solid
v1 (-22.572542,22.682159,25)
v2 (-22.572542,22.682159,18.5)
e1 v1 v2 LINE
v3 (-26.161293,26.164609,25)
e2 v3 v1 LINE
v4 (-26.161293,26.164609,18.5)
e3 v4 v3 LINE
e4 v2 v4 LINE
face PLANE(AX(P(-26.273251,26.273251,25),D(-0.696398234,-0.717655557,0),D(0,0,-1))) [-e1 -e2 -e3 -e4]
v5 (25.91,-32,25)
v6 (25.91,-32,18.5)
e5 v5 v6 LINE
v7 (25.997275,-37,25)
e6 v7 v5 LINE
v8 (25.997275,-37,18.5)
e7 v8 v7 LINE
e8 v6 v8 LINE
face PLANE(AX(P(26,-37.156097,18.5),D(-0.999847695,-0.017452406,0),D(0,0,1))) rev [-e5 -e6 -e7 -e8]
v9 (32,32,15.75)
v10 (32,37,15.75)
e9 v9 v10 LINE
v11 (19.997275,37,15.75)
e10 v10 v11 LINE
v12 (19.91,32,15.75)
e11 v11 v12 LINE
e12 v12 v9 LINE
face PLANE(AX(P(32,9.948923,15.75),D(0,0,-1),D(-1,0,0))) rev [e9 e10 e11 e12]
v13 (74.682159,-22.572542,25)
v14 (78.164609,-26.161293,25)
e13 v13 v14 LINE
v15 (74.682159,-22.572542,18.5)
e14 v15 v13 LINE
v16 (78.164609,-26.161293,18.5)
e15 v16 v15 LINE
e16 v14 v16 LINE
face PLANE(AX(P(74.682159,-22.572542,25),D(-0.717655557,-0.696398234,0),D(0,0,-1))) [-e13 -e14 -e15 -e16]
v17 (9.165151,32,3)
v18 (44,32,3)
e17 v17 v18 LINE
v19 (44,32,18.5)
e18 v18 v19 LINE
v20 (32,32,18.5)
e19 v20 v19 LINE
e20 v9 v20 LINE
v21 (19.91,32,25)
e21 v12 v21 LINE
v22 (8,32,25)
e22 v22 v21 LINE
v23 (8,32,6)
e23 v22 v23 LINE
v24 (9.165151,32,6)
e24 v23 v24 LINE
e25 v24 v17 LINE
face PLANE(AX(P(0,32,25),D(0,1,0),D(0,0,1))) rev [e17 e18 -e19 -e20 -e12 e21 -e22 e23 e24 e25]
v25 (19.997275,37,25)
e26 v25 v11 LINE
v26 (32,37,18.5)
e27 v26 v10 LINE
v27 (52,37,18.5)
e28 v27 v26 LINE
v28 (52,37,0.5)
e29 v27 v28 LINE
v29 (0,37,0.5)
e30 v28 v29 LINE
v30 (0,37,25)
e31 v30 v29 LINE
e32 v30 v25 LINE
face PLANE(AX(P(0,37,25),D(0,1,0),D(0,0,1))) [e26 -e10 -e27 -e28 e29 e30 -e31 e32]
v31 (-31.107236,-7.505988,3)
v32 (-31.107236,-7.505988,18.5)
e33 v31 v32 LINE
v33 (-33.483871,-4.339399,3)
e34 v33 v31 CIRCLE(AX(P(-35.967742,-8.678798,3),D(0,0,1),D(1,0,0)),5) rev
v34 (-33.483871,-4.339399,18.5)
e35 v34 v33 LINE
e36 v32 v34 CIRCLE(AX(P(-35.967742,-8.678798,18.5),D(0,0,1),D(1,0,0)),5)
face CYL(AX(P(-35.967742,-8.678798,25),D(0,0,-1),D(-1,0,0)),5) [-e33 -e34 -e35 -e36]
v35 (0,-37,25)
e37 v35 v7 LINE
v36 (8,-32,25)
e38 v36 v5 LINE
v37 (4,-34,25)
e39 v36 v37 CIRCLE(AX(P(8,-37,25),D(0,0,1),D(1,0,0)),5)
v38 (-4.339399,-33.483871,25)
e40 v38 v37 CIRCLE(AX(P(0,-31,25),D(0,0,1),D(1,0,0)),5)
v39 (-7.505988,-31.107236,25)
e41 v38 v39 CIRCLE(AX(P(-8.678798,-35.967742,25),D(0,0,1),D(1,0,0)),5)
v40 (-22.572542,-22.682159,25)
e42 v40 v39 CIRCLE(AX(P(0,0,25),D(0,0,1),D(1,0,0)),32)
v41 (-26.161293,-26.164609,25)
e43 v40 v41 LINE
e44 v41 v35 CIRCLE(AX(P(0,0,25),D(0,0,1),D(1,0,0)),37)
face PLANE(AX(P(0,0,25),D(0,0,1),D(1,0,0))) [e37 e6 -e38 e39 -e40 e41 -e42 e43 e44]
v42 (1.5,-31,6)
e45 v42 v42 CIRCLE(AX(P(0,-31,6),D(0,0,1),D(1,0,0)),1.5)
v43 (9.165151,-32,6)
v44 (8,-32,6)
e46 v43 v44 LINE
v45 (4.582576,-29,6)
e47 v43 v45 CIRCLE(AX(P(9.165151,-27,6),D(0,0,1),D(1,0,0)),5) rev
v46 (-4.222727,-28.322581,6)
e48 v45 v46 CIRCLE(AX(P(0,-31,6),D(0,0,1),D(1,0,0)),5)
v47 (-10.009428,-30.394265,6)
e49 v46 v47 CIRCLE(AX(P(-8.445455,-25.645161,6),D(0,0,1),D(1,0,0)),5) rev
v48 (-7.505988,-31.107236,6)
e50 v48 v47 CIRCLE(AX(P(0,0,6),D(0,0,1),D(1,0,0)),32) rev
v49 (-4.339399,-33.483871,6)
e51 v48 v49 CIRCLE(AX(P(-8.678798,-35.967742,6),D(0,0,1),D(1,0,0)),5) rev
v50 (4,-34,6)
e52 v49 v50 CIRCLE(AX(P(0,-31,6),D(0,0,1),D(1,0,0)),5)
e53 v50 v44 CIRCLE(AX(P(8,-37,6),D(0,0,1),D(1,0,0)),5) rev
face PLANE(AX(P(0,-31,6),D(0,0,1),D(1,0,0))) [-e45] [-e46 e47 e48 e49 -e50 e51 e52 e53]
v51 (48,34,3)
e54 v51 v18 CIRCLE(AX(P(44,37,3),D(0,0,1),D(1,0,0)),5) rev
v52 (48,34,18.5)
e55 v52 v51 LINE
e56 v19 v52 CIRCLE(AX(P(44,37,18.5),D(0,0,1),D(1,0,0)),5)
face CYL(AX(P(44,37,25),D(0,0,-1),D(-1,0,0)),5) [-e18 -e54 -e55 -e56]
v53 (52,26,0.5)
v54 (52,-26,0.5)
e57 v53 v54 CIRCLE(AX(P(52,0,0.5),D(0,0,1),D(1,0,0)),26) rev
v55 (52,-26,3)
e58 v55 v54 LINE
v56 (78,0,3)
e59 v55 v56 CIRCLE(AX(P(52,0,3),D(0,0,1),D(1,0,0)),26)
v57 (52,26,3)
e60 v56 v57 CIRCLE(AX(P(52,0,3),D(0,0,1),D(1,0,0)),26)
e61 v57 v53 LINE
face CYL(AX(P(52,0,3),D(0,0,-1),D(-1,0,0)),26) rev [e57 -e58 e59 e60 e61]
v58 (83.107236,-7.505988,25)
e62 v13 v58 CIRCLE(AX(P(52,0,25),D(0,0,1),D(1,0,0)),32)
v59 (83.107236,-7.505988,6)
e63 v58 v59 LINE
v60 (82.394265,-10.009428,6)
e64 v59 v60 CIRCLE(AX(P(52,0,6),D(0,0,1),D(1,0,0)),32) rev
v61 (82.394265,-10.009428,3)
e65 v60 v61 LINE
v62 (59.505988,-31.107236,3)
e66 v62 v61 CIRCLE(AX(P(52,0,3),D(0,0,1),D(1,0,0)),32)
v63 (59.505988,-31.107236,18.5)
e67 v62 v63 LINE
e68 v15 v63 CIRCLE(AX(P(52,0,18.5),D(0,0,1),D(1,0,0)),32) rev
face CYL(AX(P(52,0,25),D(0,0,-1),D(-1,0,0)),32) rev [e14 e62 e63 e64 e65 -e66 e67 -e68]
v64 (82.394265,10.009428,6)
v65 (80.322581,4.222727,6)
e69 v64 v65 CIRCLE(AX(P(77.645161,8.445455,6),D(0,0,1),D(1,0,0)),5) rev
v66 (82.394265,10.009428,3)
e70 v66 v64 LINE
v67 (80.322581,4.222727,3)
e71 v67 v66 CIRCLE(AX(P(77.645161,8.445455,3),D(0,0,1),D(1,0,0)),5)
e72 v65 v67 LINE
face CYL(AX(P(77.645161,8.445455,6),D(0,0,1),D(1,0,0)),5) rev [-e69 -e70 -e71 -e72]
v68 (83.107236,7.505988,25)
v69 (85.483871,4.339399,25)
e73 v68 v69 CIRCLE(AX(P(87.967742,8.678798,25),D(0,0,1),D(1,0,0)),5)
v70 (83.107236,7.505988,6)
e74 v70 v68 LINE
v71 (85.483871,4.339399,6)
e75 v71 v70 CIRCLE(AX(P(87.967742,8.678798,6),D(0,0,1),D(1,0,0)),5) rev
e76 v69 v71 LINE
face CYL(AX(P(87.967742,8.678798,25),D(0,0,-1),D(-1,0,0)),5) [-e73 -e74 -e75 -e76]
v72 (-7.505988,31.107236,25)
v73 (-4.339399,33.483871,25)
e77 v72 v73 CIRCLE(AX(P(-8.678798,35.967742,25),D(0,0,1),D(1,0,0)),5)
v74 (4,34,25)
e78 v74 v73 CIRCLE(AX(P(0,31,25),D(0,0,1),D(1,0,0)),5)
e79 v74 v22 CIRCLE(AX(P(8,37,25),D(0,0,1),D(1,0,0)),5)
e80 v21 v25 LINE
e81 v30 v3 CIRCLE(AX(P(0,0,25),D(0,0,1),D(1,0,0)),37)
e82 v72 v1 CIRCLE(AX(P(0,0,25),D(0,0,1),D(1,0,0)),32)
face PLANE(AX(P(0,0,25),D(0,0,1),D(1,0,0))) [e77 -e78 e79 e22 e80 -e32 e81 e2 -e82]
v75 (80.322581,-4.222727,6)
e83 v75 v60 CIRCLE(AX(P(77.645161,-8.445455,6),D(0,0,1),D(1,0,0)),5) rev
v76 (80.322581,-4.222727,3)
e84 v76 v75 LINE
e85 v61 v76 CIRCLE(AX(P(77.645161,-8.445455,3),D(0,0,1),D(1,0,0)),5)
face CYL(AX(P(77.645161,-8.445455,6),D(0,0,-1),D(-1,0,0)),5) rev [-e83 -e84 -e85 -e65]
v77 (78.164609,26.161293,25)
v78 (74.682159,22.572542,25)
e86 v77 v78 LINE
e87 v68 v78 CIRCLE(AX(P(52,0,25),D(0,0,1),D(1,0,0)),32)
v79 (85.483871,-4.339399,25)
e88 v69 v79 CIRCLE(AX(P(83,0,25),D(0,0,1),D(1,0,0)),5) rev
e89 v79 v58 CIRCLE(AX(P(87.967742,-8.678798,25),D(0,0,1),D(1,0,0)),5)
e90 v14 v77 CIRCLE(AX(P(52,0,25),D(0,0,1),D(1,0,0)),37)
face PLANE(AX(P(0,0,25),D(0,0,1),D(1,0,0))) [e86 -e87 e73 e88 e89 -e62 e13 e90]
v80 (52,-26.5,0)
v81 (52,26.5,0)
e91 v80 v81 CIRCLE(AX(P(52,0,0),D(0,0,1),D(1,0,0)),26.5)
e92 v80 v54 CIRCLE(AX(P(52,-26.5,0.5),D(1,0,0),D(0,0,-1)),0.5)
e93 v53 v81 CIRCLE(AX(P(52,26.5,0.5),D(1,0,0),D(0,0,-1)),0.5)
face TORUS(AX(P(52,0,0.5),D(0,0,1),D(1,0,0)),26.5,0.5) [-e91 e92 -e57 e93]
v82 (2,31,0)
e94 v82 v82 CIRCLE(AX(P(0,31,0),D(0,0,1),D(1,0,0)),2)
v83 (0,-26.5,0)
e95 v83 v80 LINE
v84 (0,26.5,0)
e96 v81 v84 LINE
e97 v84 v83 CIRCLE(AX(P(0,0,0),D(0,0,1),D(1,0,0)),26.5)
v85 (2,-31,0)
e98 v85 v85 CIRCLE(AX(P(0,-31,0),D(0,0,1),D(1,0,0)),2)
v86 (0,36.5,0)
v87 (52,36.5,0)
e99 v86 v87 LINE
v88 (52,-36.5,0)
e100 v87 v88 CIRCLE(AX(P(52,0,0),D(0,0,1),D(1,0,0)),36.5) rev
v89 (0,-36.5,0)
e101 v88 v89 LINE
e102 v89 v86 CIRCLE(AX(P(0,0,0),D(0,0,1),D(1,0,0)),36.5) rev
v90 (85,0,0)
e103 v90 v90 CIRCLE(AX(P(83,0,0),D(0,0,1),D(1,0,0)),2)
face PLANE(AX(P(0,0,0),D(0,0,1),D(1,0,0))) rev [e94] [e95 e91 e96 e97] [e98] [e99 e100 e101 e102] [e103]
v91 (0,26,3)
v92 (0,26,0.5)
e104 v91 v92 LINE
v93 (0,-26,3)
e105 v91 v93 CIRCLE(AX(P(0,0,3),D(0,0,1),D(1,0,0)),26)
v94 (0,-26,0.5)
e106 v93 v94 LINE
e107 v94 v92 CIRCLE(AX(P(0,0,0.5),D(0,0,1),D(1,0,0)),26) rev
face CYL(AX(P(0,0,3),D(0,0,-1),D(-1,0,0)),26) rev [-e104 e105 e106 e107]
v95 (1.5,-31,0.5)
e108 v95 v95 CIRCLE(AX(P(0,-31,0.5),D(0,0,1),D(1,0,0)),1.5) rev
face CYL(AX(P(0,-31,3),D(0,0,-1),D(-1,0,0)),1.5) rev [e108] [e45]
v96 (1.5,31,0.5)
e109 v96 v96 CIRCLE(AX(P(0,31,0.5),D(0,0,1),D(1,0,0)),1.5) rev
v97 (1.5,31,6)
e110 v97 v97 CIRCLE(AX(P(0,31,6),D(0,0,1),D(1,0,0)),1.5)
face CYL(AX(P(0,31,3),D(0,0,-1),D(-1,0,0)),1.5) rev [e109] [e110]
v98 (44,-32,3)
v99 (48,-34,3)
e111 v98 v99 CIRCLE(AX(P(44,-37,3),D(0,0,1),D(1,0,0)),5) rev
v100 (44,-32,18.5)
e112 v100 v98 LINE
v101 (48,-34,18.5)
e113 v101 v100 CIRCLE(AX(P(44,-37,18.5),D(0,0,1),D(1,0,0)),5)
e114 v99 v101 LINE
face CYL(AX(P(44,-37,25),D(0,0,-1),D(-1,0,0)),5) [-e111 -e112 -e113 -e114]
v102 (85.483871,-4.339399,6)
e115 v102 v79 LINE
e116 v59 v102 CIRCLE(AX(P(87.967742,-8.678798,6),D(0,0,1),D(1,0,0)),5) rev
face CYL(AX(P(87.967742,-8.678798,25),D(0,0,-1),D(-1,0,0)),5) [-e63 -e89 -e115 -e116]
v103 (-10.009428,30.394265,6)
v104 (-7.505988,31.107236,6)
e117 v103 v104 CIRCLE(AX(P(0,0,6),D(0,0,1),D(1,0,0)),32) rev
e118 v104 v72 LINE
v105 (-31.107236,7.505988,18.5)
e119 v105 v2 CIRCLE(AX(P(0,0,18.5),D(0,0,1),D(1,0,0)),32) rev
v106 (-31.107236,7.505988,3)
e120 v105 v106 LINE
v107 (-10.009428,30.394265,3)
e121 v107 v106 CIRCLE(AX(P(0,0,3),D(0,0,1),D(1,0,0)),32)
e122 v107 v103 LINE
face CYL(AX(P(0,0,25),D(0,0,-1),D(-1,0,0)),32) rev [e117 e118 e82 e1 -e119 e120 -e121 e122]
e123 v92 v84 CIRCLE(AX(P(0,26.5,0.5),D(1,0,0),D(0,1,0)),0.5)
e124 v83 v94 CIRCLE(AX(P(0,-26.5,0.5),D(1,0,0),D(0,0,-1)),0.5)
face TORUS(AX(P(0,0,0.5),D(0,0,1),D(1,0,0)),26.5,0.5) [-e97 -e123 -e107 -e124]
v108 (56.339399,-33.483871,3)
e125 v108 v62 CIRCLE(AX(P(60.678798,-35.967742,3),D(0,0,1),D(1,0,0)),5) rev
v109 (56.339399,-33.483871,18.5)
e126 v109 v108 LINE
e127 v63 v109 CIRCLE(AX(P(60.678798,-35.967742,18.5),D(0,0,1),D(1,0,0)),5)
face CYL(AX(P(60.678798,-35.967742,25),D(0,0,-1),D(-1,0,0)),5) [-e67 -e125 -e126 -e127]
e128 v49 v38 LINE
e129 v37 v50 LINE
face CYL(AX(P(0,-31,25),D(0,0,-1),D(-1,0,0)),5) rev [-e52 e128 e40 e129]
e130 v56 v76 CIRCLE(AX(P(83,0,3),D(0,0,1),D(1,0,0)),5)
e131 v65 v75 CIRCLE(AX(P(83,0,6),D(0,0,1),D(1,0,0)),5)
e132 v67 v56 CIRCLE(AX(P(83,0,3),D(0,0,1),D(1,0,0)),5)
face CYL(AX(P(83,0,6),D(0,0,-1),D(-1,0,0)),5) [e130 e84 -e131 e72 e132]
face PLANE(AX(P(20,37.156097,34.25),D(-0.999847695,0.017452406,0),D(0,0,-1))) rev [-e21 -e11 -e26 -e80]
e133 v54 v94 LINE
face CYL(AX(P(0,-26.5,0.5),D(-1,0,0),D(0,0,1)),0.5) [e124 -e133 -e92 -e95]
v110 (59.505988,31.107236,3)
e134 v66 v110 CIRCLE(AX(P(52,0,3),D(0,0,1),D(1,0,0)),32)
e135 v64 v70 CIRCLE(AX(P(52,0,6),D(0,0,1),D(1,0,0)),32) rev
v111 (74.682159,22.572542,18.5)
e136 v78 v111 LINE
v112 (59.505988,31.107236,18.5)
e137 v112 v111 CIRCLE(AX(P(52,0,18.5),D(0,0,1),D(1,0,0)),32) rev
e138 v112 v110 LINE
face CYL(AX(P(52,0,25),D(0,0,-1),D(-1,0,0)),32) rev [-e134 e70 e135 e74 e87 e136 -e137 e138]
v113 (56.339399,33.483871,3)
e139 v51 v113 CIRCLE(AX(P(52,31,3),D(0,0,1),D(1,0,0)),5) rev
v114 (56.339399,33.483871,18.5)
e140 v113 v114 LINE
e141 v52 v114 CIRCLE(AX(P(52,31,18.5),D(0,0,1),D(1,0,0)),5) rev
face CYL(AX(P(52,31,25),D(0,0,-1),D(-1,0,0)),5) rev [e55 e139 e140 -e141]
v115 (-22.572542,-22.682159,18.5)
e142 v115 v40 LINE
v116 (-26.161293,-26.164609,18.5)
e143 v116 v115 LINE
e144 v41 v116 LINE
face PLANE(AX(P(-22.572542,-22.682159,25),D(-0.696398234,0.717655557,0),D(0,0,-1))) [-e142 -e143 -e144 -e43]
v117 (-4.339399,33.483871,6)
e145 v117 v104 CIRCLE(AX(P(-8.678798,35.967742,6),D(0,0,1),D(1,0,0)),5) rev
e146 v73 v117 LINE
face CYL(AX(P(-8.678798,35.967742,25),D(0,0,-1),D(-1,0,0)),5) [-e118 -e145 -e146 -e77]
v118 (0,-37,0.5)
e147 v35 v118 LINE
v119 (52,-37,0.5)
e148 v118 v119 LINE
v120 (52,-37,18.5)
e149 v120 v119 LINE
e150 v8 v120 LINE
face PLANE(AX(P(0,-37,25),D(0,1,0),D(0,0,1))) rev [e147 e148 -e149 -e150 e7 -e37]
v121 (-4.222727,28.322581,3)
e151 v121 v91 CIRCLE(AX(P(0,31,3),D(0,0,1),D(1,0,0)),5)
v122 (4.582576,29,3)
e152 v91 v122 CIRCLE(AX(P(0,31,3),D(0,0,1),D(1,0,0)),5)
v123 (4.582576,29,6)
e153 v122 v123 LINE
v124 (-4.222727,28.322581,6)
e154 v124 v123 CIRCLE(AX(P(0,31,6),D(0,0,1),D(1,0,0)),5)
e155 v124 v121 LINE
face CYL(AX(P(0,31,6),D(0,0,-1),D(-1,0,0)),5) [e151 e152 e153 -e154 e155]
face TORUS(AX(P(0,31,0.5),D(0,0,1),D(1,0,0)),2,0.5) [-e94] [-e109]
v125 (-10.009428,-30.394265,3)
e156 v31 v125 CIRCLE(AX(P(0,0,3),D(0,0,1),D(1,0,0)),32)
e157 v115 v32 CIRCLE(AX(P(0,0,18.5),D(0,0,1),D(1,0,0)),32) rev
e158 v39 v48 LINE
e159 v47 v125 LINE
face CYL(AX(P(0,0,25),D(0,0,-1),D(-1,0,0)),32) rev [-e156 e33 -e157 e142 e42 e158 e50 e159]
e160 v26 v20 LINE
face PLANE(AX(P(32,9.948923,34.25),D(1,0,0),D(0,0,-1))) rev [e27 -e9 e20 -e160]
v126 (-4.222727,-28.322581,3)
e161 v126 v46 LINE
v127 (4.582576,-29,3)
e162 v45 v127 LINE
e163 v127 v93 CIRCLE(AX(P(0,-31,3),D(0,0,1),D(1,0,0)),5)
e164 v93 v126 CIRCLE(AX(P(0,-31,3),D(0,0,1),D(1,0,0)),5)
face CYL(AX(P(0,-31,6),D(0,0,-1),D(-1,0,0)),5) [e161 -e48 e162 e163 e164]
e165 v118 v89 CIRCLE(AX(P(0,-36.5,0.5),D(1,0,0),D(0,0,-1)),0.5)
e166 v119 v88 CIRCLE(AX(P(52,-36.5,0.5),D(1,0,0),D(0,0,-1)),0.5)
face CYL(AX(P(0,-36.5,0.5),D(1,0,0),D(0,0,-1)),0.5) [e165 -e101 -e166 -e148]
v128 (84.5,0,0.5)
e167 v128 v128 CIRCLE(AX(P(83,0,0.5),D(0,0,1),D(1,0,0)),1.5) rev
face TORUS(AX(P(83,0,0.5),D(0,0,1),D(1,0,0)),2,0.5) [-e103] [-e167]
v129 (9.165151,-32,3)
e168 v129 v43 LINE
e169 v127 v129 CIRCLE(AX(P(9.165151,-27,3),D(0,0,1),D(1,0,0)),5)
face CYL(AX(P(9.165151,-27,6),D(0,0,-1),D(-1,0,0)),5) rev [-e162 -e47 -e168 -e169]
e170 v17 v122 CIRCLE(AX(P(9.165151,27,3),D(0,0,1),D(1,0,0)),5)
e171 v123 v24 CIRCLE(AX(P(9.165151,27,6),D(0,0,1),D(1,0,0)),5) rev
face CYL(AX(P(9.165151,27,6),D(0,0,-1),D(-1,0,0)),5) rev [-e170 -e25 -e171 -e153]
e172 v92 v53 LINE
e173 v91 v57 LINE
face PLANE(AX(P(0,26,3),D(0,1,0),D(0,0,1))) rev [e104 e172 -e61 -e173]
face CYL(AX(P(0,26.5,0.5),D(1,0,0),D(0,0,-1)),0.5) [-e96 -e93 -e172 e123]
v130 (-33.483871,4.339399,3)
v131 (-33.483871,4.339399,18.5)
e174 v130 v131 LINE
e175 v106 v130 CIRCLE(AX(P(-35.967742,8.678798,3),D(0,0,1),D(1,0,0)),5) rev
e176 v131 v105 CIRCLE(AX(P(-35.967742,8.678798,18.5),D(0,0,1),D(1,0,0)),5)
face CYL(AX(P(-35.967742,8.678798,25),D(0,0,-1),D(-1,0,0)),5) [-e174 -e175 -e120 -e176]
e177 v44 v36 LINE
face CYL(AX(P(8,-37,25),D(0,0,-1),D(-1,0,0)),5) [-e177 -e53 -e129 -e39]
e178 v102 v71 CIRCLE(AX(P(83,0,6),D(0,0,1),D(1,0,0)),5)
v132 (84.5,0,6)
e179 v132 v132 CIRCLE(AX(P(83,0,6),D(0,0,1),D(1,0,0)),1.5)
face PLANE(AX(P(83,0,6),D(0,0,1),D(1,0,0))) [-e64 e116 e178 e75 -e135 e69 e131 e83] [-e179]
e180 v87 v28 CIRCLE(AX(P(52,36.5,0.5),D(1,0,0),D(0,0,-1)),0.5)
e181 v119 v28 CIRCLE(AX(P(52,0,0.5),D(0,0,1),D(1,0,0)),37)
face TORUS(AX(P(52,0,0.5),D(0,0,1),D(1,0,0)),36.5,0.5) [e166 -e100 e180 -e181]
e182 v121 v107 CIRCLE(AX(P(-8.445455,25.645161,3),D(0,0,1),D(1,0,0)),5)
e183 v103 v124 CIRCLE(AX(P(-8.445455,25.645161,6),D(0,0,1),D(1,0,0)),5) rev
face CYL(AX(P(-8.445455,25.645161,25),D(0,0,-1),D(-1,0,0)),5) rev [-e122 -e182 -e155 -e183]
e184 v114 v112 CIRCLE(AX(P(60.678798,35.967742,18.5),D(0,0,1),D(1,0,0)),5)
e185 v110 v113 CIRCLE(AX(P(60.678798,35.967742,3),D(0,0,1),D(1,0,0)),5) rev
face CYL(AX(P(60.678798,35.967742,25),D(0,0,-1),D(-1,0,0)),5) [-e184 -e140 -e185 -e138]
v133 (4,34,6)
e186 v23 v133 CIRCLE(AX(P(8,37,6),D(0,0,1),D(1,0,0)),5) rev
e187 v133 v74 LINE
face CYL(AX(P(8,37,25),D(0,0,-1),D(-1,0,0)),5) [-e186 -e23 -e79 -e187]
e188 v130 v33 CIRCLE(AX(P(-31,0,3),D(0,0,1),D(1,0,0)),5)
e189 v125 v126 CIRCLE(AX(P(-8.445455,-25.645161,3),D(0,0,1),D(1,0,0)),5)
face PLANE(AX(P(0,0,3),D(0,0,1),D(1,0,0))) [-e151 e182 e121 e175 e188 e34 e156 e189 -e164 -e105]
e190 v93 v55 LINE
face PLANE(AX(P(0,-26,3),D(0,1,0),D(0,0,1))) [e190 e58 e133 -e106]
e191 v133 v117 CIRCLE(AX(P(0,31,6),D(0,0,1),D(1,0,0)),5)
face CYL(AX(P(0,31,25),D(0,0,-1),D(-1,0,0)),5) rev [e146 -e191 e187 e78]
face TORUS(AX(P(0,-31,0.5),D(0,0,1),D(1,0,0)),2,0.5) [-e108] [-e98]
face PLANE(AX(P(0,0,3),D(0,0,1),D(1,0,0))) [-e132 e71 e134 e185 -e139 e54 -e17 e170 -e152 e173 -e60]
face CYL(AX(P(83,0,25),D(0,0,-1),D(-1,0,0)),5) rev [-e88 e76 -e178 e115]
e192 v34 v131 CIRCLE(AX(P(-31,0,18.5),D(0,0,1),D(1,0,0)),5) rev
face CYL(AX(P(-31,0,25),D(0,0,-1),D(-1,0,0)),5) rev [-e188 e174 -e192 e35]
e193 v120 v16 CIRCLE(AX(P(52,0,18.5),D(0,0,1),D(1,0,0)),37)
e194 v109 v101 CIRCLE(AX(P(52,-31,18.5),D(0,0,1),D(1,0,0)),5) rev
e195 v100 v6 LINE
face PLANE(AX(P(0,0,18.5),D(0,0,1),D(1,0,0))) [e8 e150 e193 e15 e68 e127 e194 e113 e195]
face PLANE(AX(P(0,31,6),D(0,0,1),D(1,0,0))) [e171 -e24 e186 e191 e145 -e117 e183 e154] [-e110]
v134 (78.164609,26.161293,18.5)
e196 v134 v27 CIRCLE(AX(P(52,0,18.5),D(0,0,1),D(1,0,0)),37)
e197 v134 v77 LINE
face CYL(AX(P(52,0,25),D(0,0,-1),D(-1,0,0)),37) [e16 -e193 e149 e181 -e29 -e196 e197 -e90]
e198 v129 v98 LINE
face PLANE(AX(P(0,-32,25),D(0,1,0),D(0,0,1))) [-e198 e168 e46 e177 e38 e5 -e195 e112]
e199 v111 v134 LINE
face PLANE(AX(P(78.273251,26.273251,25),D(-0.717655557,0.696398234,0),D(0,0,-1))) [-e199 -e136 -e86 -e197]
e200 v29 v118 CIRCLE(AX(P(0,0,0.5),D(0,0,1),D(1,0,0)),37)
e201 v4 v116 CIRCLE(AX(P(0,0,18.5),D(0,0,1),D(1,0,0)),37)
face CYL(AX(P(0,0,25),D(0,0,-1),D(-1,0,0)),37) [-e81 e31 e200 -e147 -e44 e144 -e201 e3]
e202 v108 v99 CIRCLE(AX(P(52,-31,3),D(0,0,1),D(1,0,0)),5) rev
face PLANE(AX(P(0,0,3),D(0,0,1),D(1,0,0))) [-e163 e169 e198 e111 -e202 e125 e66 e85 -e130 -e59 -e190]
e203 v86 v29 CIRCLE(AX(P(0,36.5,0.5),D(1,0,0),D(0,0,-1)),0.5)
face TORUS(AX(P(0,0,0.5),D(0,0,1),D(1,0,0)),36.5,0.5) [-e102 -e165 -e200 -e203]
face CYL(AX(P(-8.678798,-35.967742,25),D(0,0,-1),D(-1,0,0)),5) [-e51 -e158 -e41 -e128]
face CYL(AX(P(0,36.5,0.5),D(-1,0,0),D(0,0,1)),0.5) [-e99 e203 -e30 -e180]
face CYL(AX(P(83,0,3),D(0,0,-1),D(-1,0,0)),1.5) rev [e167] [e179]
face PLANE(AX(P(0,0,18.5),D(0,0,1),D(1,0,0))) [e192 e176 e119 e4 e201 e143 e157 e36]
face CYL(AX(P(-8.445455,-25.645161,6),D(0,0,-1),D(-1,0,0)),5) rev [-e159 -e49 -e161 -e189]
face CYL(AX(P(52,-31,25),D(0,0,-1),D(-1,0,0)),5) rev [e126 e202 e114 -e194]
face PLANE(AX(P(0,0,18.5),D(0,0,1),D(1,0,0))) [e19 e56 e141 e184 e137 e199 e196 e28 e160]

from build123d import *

# Parameters (mm, degrees)
BOSS_EXTRUDE1_DEPTH = 25
SKETCH1_3_R         = 1.5
BOSS_EXTRUDE2_DEPTH = 3
SKETCH2_W           = 12
SKETCH2_H           = 18.5
CUT_EXTRUDE1_DEPTH  = 5
BOSS_EXTRUDE3_START = 3
SKETCH1_4_R         = 5
SKETCH1_4_R_2       = 1.5
BOSS_EXTRUDE3_DEPTH = 3
FILLET2_R           = 5
FILLET3_R           = 5
FILLET1_R           = 0.5
CUT_EXTRUDE4_START  = -6.5
CUT_EXTRUDE4_DEPTH  = 6.5
CHAMFER1_START      = 18.5
CHAMFER1_DEPTH      = 6.5
CHAMFER1_START_2    = 15.75
CHAMFER1_2_DEPTH    = 2.75


with BuildPart() as part:
    # Sketch1 → Boss-Extrude1 (new body)
    with BuildSketch(Plane.XY):
        with BuildLine():
            Line((52, 37), (0, 37))
            ThreePointArc((0, 37), (-37, 0), (0, -37))
            Line((0, -37), (52, -37))
            ThreePointArc((52, -37), (89, 0), (52, 37))
        make_face()
        with BuildLine():
            ThreePointArc((-31.612903226, 4.96229278), (-22.627416998, 22.627416998), (-4.96229278, 31.612903226))
            ThreePointArc((-4.96229278, 31.612903226), (-0.196120171, 35.996152207), (4.898979486, 32))
            Line((4.898979486, 32), (47.101020514, 32))
            ThreePointArc((47.101020514, 32), (52.196120171, 35.996152207), (56.96229278, 31.612903226))
            ThreePointArc((56.96229278, 31.612903226), (74.627416998, 22.627416998), (83.612903226, 4.96229278))
            ThreePointArc((83.612903226, 4.96229278), (86.745965572, 3.311758134), (88, 0))
            ThreePointArc((88, 0), (86.745965572, -3.311758134), (83.612903226, -4.96229278))
            ThreePointArc((83.612903226, -4.96229278), (74.627416998, -22.627416998), (56.96229278, -31.612903226))
            ThreePointArc((56.96229278, -31.612903226), (52.196120171, -35.996152207), (47.101020514, -32))
            Line((47.101020514, -32), (4.898979486, -32))
            ThreePointArc((4.898979486, -32), (-0.196120171, -35.996152207), (-4.96229278, -31.612903226))
            ThreePointArc((-4.96229278, -31.612903226), (-22.627416998, -22.627416998), (-31.612903226, -4.96229278))
            ThreePointArc((-31.612903226, -4.96229278), (-36, 0), (-31.612903226, 4.96229278))
        make_face(mode=Mode.SUBTRACT)
    extrude(amount=BOSS_EXTRUDE1_DEPTH)

    # Sketch1<3> → Boss-Extrude2 (add)
    with BuildSketch(Plane.XY):
        with BuildLine():
            Line((4.898979486, -32), (47.101020514, -32))
            ThreePointArc((47.101020514, -32), (52.196120171, -35.996152207), (56.96229278, -31.612903226))
            ThreePointArc((56.96229278, -31.612903226), (74.627416998, -22.627416998), (83.612903226, -4.96229278))
            ThreePointArc((83.612903226, -4.96229278), (88, 0), (83.612903226, 4.96229278))
            ThreePointArc((83.612903226, 4.96229278), (74.627416998, 22.627416998), (56.96229278, 31.612903226))
            ThreePointArc((56.96229278, 31.612903226), (52.196120171, 35.996152207), (47.101020514, 32))
            Line((47.101020514, 32), (4.898979486, 32))
            ThreePointArc((4.898979486, 32), (-0.196120171, 35.996152207), (-4.96229278, 31.612903226))
            ThreePointArc((-4.96229278, 31.612903226), (-22.627416998, 22.627416998), (-31.612903226, 4.96229278))
            ThreePointArc((-31.612903226, 4.96229278), (-36, 0), (-31.612903226, -4.96229278))
            ThreePointArc((-31.612903226, -4.96229278), (-22.627416998, -22.627416998), (-4.96229278, -31.612903226))
            ThreePointArc((-4.96229278, -31.612903226), (-0.196120171, -35.996152207), (4.898979486, -32))
        make_face()
        with Locations((0, -31)):
            Circle(SKETCH1_3_R, mode=Mode.SUBTRACT)
        with Locations((83, 0)):
            Circle(SKETCH1_3_R, mode=Mode.SUBTRACT)
        with BuildLine():
            ThreePointArc((52, 26), (78, 0), (52, -26))
            Line((52, -26), (0, -26))
            ThreePointArc((0, -26), (-26, 0), (0, 26))
            Line((0, 26), (52, 26))
        make_face(mode=Mode.SUBTRACT)
        with Locations((0, 31)):
            Circle(SKETCH1_3_R, mode=Mode.SUBTRACT)
    extrude(amount=BOSS_EXTRUDE2_DEPTH)

    # Sketch2 → Cut-Extrude1 (cut)
    with BuildSketch(Plane(origin=(0, 37, 0), x_dir=(1, 0, 0), z_dir=(0, 1, 0))):
        with Locations((26, -25)):
            Rectangle(SKETCH2_W, SKETCH2_H)
    extrude(amount=-CUT_EXTRUDE1_DEPTH, mode=Mode.SUBTRACT)

    # Sketch1<4> → Boss-Extrude3 (add)
    # profile 1 of 3: a face of its own
    with BuildSketch(Plane.XY.offset(BOSS_EXTRUDE3_START)):
        with Locations((0, 31)):
            Circle(SKETCH1_4_R)
        with Locations((0, 31)):
            Circle(SKETCH1_4_R_2, mode=Mode.SUBTRACT)
    # profile 2 of 3: a face of its own
    with BuildSketch(Plane.XY.offset(BOSS_EXTRUDE3_START)):
        with Locations((83, 0)):
            Circle(SKETCH1_4_R)
        with Locations((83, 0)):
            Circle(SKETCH1_4_R_2, mode=Mode.SUBTRACT)
    # profile 3 of 3: a face of its own
    with BuildSketch(Plane.XY.offset(BOSS_EXTRUDE3_START)):
        with Locations((0, -31)):
            Circle(SKETCH1_4_R)
        with Locations((0, -31)):
            Circle(SKETCH1_4_R_2, mode=Mode.SUBTRACT)
    extrude(amount=BOSS_EXTRUDE3_DEPTH)

    # Fillet2
    # the kernel refuses this fillet: 5 mm, written as the material it adds along each edge
    with BuildSketch(Plane(origin=(83.612903226, 4.96229278, -9.980429616), x_dir=(-0.23470679108889272, 0.9720662128768569, 0), z_dir=(0, 0, 1))) as fillet2_piece_1_section:
        with BuildLine():
            CenterArc((4.786533421, 4.983518583), FILLET2_R, 198.802392553, 75.850995491)
            ThreePointArc((0.05335441, 3.371992458), (0.319549613, 1.681362163), (0, 0))
            ThreePointArc((0, 0), (2.596085923, -0.105481068), (5.192171846, 0))
        make_face()
    fillet2_piece_1 = extrude(amount=15.980429616, mode=Mode.PRIVATE)
    fillet2_piece_1 = split(fillet2_piece_1, bisect_by=Plane(origin=(83.612903226, 4.96229278, 0), z_dir=(0, 0, 1)), keep=Keep.TOP, mode=Mode.PRIVATE)
    add(fillet2_piece_1)
    with BuildSketch(Plane(origin=(83.612903226, -4.96229278, -9.980429616), x_dir=(-0.23470679108889236, -0.972066212876857, 0), z_dir=(0, 0, 1))) as fillet2_piece_2_section:
        with BuildLine():
            CenterArc((4.786533421, -4.983518583), FILLET2_R, 85.346611956, 75.850995491)
            ThreePointArc((0.05335441, -3.371992458), (0.319549613, -1.681362163), (0, 0))
            ThreePointArc((0, 0), (2.596085923, 0.105481068), (5.192171846, 0))
        make_face()
    fillet2_piece_2 = extrude(amount=15.980429616, mode=Mode.PRIVATE)
    fillet2_piece_2 = split(fillet2_piece_2, bisect_by=Plane(origin=(83.612903226, -4.96229278, 0), z_dir=(0, 0, 1)), keep=Keep.TOP, mode=Mode.PRIVATE)
    add(fillet2_piece_2)
    with BuildSketch(Plane(origin=(-4.96229278, 31.612903226, -9.980429616), x_dir=(-0.9720662128768562, -0.23470679108889492, 0), z_dir=(0, 0, 1))) as fillet2_piece_3_section:
        with BuildLine():
            CenterArc((4.786533421, 4.983518583), FILLET2_R, 198.802392553, 75.850995491)
            ThreePointArc((0.05335441, 3.371992458), (0.319549613, 1.681362163), (0, 0))
            ThreePointArc((0, 0), (2.596085923, -0.105481068), (5.192171846, 0))
        make_face()
    fillet2_piece_3 = extrude(amount=15.980429616, mode=Mode.PRIVATE)
    fillet2_piece_3 = split(fillet2_piece_3, bisect_by=Plane(origin=(-4.96229278, 31.612903226, 0), z_dir=(0, 0, 1)), keep=Keep.TOP, mode=Mode.PRIVATE)
    add(fillet2_piece_3)
    with BuildSketch(Plane(origin=(4.898979486, 32, -7.665429761), x_dir=(1, 0, 0), z_dir=(0, 0, 1))) as fillet2_piece_4_section:
        with BuildLine():
            CenterArc((4.266171904, -5), FILLET2_R, 90, 66.421821522)
            ThreePointArc((-0.316403791, -3), (0.073441671, -1.524430968), (0, 0))
            Line((0, 0), (4.266171904, 0))
        make_face()
    fillet2_piece_4 = extrude(amount=13.665429761, mode=Mode.PRIVATE)
    fillet2_piece_4 = split(fillet2_piece_4, bisect_by=Plane(origin=(4.898979486, 32, 0), z_dir=(0, 0, 1)), keep=Keep.TOP, mode=Mode.PRIVATE)
    add(fillet2_piece_4)
    with BuildSketch(Plane(origin=(-4.96229278, -31.612903226, -9.980429616), x_dir=(-0.9720662128768564, 0.23470679108889442, 0), z_dir=(0, 0, 1))) as fillet2_piece_5_section:
        with BuildLine():
            CenterArc((4.786533421, -4.983518583), FILLET2_R, 85.346611956, 75.850995491)
            ThreePointArc((0.05335441, -3.371992458), (0.319549613, -1.681362163), (0, 0))
            ThreePointArc((0, 0), (2.596085923, 0.105481068), (5.192171846, 0))
        make_face()
    fillet2_piece_5 = extrude(amount=15.980429616, mode=Mode.PRIVATE)
    fillet2_piece_5 = split(fillet2_piece_5, bisect_by=Plane(origin=(-4.96229278, -31.612903226, 0), z_dir=(0, 0, 1)), keep=Keep.TOP, mode=Mode.PRIVATE)
    add(fillet2_piece_5)
    with BuildSketch(Plane(origin=(4.898979486, -32, -7.665429761), x_dir=(1, 0, 0), z_dir=(0, 0, 1))) as fillet2_piece_6_section:
        with BuildLine():
            CenterArc((4.266171904, 5), FILLET2_R, 203.578178478, 66.421821522)
            ThreePointArc((-0.316403791, 3), (0.073441671, 1.524430968), (0, 0))
            Line((0, 0), (4.266171904, 0))
        make_face()
    fillet2_piece_6 = extrude(amount=13.665429761, mode=Mode.PRIVATE)
    fillet2_piece_6 = split(fillet2_piece_6, bisect_by=Plane(origin=(4.898979486, -32, 0), z_dir=(0, 0, 1)), keep=Keep.TOP, mode=Mode.PRIVATE)
    add(fillet2_piece_6)

    # Fillet3
    fillet3_edges = [part.edges().sort_by_distance(p)[0] for p in [
        (-4.96229278, 31.612903226, 15.5),
        (-31.612903226, 4.96229278, 14),
        (-31.612903226, -4.96229278, 14),
        (-4.96229278, -31.612903226, 15.5),
        (4.898979486, -32, 15.5),
        (47.101020514, -32, 14),
        (56.96229278, -31.612903226, 14),
        (83.612903226, -4.96229278, 15.5),
        (83.612903226, 4.96229278, 15.5),
        (56.96229278, 31.612903226, 14),
        (47.101020514, 32, 14),
        (4.898979486, 32, 15.5),
    ]]
    fillet(fillet3_edges, radius=FILLET3_R)

    # Fillet1
    fillet1_edges = [part.edges().sort_by_distance(p)[0] for p in [
        (-37, 0, 0),
        (26, 37, 0),
        (89, 0, 0),
        (26, -37, 0),
        (-1.5, 31, 0),
        (-1.5, -31, 0),
        (-26, 0, 0),
        (26, -26, 0),
        (78, 0, 0),
        (81.5, 0, 0),
        (26, 26, 0),
    ]]
    fillet(fillet1_edges, radius=FILLET1_R)

    # Sketch3 → Cut-Extrude4 (cut)
    with BuildSketch(Plane.XY.offset(25).offset(CUT_EXTRUDE4_START)):
        with BuildLine():
            ThreePointArc((-31.107236269, 7.505987725), (-27.910887593, 15.651912144), (-22.627416998, 22.627416998))
            Line((-22.627416998, 22.627416998), (-26.162950904, 26.162950904))
            ThreePointArc((-26.162950904, 26.162950904), (-37, 0), (-26.162950904, -26.162950904))
            Line((-26.162950904, -26.162950904), (-22.627416998, -22.627416998))
            ThreePointArc((-22.627416998, -22.627416998), (-27.910887593, -15.651912144), (-31.107236269, -7.505987725))
            ThreePointArc((-31.107236269, -7.505987725), (-31.968768588, -5.677429925), (-33.483870968, -4.339399154))
            ThreePointArc((-33.483870968, -4.339399154), (-36, 0), (-33.483870968, 4.339399154))
            ThreePointArc((-33.483870968, 4.339399154), (-31.968768588, 5.677429925), (-31.107236269, 7.505987725))
        make_face()
        with BuildLine():
            ThreePointArc((59.505987725, 31.107236269), (67.651912144, 27.910887593), (74.627416998, 22.627416998))
            Line((74.627416998, 22.627416998), (78.162950904, 26.162950904))
            ThreePointArc((78.162950904, 26.162950904), (66.159286998, 34.183542703), (52, 37))
            Line((52, 37), (32, 37))
            Line((32, 37), (32, 32))
            Line((32, 32), (44, 32))
            ThreePointArc((44, 32), (46.236067977, 32.527864045), (48, 34))
            ThreePointArc((48, 34), (52.3088612, 35.990451358), (56.339399154, 33.483870968))
            ThreePointArc((56.339399154, 33.483870968), (57.677429925, 31.968768588), (59.505987725, 31.107236269))
        make_face()
        with BuildLine():
            Line((44, -32), (26, -32))
            Line((26, -32), (26, -37))
            Line((26, -37), (52, -37))
            ThreePointArc((52, -37), (66.159286998, -34.183542703), (78.162950904, -26.162950904))
            Line((78.162950904, -26.162950904), (74.627416998, -22.627416998))
            ThreePointArc((74.627416998, -22.627416998), (67.651912144, -27.910887593), (59.505987725, -31.107236269))
            ThreePointArc((59.505987725, -31.107236269), (57.677429925, -31.968768588), (56.339399154, -33.483870968))
            ThreePointArc((56.339399154, -33.483870968), (52.3088612, -35.990451358), (48, -34))
            ThreePointArc((48, -34), (46.236067977, -32.527864045), (44, -32))
        make_face()
    extrude(amount=CUT_EXTRUDE4_DEPTH, mode=Mode.SUBTRACT)

    # Chamfer1: read off the stored shape, not the designer's step
    # Chamfer1 outline → Chamfer1 (cut)
    with BuildSketch(Plane.XY.offset(CHAMFER1_START)):
        with BuildLine():
            Line((74.682159055, 22.572542183), (78.164608978, 26.161292724))
            ThreePointArc((78.164608978, 26.161292724), (78.163779954, 26.162121827), (78.162950904, 26.162950904))
            Line((78.162950904, 26.162950904), (74.627416998, 22.627416998))
            ThreePointArc((74.627416998, 22.627416998), (74.654804641, 22.599996165), (74.682159055, 22.572542183))
        make_face()
        with BuildLine():
            ThreePointArc((78.162950904, -26.162950904), (78.163779954, -26.162121827), (78.164608978, -26.161292724))
            Line((78.164608978, -26.161292724), (74.682159055, -22.572542183))
            ThreePointArc((74.682159055, -22.572542183), (74.654804641, -22.599996165), (74.627416998, -22.627416998))
            Line((74.627416998, -22.627416998), (78.162950904, -26.162950904))
        make_face()
        Polygon((20, 32), (20, 37), (19.997275325, 37), (19.91, 32), align=None)
        Polygon((25.997275325, -37), (26, -37), (26, -32), (25.91, -32), align=None)
        with BuildLine():
            Line((-22.572542183, 22.682159055), (-26.161292724, 26.164608978))
            ThreePointArc((-26.161292724, 26.164608978), (-26.162121827, 26.163779954), (-26.162950904, 26.162950904))
            Line((-26.162950904, 26.162950904), (-22.627416998, 22.627416998))
            ThreePointArc((-22.627416998, 22.627416998), (-22.599996165, 22.654804641), (-22.572542183, 22.682159055))
        make_face()
        with BuildLine():
            ThreePointArc((-26.162950904, -26.162950904), (-26.162121827, -26.163779954), (-26.161292724, -26.164608978))
            Line((-26.161292724, -26.164608978), (-22.572542183, -22.682159055))
            ThreePointArc((-22.572542183, -22.682159055), (-22.599996165, -22.654804641), (-22.627416998, -22.627416998))
            Line((-22.627416998, -22.627416998), (-26.162950904, -26.162950904))
        make_face()
    extrude(amount=CHAMFER1_DEPTH, mode=Mode.SUBTRACT)

    # Chamfer1 2 outline → Chamfer1 2 (cut)
    with BuildSketch(Plane.XY.offset(CHAMFER1_START_2)):
        Polygon((20, 32), (20, 37), (19.997275325, 37), (19.91, 32), align=None)
    extrude(amount=CHAMFER1_2_DEPTH, mode=Mode.SUBTRACT)


solid = part.part
